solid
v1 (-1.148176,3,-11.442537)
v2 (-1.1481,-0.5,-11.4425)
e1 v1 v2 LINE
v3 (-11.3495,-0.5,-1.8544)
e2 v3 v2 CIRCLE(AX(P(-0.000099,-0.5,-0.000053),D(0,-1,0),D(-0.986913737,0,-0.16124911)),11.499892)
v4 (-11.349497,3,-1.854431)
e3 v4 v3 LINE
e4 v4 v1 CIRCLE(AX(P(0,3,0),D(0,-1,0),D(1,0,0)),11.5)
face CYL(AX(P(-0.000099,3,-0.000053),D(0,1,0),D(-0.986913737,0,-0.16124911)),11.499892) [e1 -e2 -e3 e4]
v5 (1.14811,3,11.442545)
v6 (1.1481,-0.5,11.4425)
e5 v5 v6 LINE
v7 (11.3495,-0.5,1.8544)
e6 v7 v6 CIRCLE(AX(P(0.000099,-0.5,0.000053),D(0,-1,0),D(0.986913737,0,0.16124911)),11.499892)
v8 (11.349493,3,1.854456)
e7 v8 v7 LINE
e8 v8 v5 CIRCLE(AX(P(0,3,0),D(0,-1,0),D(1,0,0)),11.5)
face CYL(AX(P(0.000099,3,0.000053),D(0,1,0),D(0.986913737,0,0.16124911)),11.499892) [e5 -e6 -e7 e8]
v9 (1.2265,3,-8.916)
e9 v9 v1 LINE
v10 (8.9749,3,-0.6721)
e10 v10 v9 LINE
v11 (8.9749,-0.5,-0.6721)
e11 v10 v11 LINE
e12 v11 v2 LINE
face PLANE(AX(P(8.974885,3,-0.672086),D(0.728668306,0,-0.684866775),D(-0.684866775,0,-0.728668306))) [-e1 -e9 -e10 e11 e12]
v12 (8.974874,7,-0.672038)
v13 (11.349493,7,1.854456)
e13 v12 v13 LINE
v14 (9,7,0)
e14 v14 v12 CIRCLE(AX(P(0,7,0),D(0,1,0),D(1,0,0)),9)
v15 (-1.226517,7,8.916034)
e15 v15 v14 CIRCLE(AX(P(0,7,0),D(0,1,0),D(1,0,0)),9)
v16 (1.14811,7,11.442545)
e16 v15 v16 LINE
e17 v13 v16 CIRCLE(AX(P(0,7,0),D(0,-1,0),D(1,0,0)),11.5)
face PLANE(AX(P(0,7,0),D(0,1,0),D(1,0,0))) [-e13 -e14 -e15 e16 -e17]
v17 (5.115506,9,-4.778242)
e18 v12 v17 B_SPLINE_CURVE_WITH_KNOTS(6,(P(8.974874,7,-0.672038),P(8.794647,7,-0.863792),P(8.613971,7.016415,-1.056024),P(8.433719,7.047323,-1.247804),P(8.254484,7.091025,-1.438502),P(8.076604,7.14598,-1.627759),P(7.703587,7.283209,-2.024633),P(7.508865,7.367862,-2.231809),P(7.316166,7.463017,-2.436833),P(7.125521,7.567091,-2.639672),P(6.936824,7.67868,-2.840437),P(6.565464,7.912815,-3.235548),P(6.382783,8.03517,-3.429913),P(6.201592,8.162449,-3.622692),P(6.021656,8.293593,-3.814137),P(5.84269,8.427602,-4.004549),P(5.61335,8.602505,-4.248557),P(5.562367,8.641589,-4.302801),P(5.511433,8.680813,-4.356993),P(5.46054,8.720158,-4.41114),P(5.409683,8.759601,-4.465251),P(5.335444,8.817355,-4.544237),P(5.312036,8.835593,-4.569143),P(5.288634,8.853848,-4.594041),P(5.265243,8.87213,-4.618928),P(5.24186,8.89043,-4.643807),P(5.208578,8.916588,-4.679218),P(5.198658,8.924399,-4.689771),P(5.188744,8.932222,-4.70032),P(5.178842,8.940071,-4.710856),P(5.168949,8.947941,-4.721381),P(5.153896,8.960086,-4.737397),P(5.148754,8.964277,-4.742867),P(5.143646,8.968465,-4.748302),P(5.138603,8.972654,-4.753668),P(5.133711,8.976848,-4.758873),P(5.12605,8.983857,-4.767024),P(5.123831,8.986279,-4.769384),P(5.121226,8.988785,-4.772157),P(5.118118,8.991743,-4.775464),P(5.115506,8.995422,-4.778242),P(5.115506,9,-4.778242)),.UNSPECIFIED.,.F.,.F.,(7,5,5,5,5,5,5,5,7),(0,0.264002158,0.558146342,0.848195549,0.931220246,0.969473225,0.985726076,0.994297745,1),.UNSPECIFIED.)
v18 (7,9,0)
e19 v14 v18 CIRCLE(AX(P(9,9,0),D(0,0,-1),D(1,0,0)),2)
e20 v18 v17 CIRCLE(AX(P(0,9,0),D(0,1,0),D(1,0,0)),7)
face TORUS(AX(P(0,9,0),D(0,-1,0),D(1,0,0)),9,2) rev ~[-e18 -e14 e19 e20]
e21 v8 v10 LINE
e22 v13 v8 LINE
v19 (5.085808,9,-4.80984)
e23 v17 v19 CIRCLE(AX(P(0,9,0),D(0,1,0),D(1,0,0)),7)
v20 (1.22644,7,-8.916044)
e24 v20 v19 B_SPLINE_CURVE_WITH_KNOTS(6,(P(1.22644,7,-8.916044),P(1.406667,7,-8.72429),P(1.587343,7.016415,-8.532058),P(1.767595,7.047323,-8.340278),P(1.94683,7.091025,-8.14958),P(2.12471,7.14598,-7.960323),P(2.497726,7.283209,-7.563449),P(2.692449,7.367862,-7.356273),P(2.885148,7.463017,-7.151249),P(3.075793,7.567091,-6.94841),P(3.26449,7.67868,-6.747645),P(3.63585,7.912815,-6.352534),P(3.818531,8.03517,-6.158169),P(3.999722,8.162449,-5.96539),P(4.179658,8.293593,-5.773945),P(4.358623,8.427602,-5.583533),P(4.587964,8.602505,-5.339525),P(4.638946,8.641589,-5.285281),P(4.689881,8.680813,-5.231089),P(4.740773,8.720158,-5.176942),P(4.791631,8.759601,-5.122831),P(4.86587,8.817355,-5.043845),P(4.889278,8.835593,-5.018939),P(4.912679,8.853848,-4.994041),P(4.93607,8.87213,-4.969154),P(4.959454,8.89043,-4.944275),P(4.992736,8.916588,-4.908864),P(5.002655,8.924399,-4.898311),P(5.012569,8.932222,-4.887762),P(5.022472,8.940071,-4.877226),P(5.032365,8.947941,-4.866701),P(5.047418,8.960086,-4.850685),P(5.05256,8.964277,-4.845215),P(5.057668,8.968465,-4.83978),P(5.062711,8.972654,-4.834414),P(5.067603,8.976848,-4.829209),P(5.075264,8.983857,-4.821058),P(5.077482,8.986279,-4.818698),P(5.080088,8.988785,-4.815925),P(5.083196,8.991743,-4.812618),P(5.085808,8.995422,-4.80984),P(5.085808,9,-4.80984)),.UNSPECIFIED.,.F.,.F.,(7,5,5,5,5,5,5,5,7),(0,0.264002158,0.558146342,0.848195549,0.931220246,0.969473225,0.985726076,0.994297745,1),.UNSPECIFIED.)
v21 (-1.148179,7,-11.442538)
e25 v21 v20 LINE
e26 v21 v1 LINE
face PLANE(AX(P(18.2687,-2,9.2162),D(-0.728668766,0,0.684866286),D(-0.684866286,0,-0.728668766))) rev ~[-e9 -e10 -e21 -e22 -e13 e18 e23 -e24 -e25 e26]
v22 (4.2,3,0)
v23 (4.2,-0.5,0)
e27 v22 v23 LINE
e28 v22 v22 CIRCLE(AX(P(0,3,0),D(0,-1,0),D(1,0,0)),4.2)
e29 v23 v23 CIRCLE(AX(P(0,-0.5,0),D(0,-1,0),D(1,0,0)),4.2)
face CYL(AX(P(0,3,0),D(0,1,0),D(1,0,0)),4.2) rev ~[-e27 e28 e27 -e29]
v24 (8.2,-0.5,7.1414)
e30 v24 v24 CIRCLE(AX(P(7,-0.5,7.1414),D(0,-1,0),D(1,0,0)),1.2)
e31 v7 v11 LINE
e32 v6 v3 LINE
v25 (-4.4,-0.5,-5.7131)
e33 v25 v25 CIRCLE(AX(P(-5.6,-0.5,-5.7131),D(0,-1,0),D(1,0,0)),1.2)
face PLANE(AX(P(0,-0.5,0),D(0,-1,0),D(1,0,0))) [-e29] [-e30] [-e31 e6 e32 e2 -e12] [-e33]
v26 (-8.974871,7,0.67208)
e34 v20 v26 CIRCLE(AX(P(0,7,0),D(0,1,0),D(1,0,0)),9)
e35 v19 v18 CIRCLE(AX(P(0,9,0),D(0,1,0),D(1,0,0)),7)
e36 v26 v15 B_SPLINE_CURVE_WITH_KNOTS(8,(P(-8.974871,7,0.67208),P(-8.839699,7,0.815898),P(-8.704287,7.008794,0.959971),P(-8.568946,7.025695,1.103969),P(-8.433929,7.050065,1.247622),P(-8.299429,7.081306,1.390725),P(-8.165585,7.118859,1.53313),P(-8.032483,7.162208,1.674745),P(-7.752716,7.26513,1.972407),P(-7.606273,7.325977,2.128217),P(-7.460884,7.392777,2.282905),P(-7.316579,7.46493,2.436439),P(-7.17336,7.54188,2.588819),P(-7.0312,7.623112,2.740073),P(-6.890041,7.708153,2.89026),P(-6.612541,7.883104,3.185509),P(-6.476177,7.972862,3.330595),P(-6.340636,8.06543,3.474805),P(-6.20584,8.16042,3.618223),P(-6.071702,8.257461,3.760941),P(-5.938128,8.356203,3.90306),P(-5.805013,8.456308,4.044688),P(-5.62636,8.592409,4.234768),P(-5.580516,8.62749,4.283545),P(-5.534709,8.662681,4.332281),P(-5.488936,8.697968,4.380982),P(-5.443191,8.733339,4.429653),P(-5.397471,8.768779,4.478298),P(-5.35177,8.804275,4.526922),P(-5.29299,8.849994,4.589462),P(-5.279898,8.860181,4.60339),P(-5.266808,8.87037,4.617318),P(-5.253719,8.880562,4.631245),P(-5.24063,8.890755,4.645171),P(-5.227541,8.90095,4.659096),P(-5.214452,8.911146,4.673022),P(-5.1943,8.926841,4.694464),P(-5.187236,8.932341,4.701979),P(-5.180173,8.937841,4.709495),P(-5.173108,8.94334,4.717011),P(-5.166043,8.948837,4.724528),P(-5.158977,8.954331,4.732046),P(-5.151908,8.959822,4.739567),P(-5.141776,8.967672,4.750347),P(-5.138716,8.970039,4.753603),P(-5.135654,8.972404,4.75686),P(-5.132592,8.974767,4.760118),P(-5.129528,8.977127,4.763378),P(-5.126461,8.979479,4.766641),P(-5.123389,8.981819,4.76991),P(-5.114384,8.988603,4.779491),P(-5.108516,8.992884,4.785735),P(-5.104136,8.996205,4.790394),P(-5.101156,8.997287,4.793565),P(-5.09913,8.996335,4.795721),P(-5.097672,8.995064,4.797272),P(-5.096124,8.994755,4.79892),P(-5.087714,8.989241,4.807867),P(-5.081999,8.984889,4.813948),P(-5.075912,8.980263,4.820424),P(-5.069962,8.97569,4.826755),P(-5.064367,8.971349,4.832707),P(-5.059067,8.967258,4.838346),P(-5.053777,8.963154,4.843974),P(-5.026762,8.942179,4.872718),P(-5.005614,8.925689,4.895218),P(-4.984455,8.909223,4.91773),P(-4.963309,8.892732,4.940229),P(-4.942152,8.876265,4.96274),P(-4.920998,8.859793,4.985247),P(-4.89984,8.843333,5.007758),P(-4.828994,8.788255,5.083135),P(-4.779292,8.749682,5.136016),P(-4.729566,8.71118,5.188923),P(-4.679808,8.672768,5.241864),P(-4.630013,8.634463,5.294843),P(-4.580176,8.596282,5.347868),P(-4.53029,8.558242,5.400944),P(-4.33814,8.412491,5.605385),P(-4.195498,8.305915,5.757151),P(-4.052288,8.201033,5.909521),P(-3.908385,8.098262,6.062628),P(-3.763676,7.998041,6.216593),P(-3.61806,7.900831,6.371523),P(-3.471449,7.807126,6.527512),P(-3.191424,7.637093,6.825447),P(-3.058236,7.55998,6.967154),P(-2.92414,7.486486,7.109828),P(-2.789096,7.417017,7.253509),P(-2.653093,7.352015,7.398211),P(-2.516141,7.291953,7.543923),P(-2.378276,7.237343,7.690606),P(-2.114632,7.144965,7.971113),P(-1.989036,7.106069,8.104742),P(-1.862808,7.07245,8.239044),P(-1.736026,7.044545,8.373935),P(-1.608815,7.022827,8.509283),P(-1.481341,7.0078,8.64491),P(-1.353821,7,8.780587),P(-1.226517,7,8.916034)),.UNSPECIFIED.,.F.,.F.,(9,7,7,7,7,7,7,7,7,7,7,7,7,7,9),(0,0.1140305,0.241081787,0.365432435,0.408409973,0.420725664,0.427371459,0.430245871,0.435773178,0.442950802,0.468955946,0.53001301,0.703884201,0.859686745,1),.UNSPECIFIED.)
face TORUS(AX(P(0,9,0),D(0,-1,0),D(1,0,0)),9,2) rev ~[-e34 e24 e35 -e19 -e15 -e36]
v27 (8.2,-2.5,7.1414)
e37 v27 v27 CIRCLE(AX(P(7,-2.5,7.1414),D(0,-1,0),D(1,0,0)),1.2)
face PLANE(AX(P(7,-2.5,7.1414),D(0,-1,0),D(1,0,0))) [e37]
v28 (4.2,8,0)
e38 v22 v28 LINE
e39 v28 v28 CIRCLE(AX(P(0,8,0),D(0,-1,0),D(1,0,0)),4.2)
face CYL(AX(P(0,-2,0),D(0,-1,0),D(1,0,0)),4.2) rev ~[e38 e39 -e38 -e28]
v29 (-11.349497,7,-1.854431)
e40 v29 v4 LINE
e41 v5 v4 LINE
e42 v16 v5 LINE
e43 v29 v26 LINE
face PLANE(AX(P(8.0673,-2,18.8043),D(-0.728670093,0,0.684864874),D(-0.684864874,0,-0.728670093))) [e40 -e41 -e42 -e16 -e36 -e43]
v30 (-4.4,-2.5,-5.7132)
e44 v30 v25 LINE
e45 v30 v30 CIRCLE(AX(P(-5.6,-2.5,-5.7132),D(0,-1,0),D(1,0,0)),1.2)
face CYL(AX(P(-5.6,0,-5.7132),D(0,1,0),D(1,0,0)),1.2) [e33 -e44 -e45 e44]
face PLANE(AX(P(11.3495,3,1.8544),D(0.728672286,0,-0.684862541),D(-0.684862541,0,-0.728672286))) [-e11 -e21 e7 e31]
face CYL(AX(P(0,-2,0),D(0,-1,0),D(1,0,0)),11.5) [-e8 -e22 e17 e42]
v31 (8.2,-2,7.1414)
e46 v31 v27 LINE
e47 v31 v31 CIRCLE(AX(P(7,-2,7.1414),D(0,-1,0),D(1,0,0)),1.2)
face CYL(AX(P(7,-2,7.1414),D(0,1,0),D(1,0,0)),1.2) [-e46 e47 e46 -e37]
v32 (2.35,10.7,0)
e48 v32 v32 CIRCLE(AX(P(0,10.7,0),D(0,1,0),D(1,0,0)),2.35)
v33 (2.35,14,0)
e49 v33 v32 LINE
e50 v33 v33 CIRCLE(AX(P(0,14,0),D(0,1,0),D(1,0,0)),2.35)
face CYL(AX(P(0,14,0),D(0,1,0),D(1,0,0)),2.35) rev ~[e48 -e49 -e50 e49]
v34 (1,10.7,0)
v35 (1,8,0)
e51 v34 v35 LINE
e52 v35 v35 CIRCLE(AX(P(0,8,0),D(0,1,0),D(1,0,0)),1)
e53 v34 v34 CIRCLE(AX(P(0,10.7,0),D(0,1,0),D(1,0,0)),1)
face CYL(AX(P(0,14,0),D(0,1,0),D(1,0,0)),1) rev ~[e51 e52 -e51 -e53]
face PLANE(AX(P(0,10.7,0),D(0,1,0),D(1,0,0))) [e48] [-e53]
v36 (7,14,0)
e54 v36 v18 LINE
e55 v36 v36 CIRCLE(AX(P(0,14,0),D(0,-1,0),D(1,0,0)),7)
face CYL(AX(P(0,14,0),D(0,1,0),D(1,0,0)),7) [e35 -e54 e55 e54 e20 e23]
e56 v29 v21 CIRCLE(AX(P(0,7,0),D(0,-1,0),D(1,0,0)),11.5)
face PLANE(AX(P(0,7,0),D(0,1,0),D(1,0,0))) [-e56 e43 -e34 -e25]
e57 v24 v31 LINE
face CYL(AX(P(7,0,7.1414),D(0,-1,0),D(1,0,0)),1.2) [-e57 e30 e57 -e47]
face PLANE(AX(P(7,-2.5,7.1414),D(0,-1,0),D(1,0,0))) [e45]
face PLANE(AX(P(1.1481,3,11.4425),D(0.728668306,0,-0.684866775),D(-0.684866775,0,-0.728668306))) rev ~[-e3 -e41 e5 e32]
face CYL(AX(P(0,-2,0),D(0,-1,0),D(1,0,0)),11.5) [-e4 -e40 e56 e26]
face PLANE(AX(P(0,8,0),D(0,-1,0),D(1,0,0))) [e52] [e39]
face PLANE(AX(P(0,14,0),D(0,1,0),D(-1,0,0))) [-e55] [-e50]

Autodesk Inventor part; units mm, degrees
ref_plane "YZ Plane" through (0, 0, 0) normal (1, 0, 0) x (0, 1, 0)
ref_plane "XZ Plane" through (0, 0, 0) normal (0, 1, 0) x (-1, 0, 0)
ref_plane "XY Plane" through (0, 0, 0) normal (0, 0, 1) x (1, 0, 0)
sketch "Skizze1" plane through (0, 0, 0) normal (0, 1, 0) x (-1, 0, 0)
  circle A0 centre (0, 0) radius 15
  dimension "d0" = 30
extrude "Extrusion1" add sketch "Skizze1" along normal blind 14
sketch "Skizze2" plane through (0, 0, 0) normal (0, -1, 0) x (1, 0, 0)
  line L0 (14.3188, 0.9) -> (12.9688, 0.9)
  line L1 (12.9688, -0.9) -> (14.3188, -0.9)
  line L2 (14.3188, -0.9) -> (14.3188, 0.9)
  line L3 (-21.3175, 0) -> (21.3175, 0) projected
  arc A0 (12.9688, 0.9) -> (0.9, 12.9688) centre (0, 0) ccw
  line L4 (-0.9, -12.9688) -> (-0.9, -14.3188)
  line L5 (-0.9, -14.3188) -> (0.9, -14.3188)
  line L6 (0.9, -14.3188) -> (0.9, -12.9688)
  line L7 (-12.9688, 0.9) -> (-14.3188, 0.9)
  line L8 (-14.3188, 0.9) -> (-14.3188, -0.9)
  line L9 (-14.3188, -0.9) -> (-12.9688, -0.9)
  line L10 (-0.9, 12.9688) -> (-0.9, 14.3188)
  line L11 (-0.9, 14.3188) -> (0.9, 14.3188)
  line L12 (0.9, 14.3188) -> (0.9, 12.9688)
  line L13 (0, -21.3175) -> (0, 21.3175) projected
  line L14 (-21.3175, 0) -> (21.3175, 0) projected
  arc A1 (0.9, -12.9688) -> (12.9688, -0.9) centre (0, 0) ccw
  arc A2 (-12.9688, -0.9) -> (-0.9, -12.9688) centre (0, 0) ccw
  arc A3 (-0.9, 12.9688) -> (-12.9688, 0.9) centre (0, 0) ccw
  circle A4 centre (0, 0) radius 4.2
  circle A5 centre (7, 7.1414) radius 1.2
  circle A6 centre (-5.6, -5.7131) radius 1.2
  dimension "d4" = 0.9
  dimension "d5" = 0.9
  dimension "d8" = 1.35
  dimension "d9" = 1.35
  dimension "d10" = 1.8
  dimension "d11" = 0.9
  dimension "d12" = 1.35
  dimension "d13" = 1.8
  dimension "d14" = 0.9
  dimension "d15" = 0.9
  dimension "d16" = 1.35
  dimension "d17" = 8.4
  dimension "d18" = 2.4
  dimension "d19" = 2.4
  dimension "d20" = 8
  dimension "d21" = 10
  dimension "d22" = 7
  dimension "d23" = 5.6
  dimension "d50" = 13
  dimension "d51" = 13
  dimension "d52" = 1.35
  dimension "d53" = 1.35
  dimension "d54" = 1.35
extrude "Extrusion2" cut sketch "Skizze2" against normal blind 3 contours L2 L3 A4 L13 L11 L12 A0 L0 | L2 L1 A1 L6 L5 L13 A4 L3 | A4 L3 L8 L7 A3 L10 L11 L13 | L13 L5 L4 A2 L9 L8 L3 A4
sketch "Skizze4" plane through (7, 0, 7.1414) normal (0, -1, 0) x (1, 0, 0)
  circle A0 centre (-7, -7.1414) radius 4.2
  circle A1 centre (-12.6, -12.8546) radius 1.2
  circle A2 centre (0, 0) radius 1.2
  line L0 (-7, -28.1414) -> (-7, 13.8586) projected
  dimension "d26" = 2.4
  dimension "d27" = 5.6
  dimension "d28" = 8
  dimension "d44" = 8.4
  dimension "d45" = 2.4
extrude "Extrusion3" add sketch "Skizze4" along normal blind 2
sketch "Skizze5" plane through (0, 14, 0) normal (0, 1, 0) x (1, 0, 0)
  circle A0 centre (0, 0) radius 19.262
  circle A1 centre (0, 0) radius 7
  dimension "d31" = 14
extrude "Extrusion4" cut sketch "Skizze5" against normal blind 7
fillet "Rundung1" radius 1 8 edges at (12.9688, 1.5, -0.9) (12.9688, 1.5, 0.9) (0.9, 1.5, -12.9688) (-0.9, 1.5, -12.9688) (-12.9688, 1.5, -0.9) (-12.9688, 1.5, 0.9) (-0.9, 1.5, 12.9688) (0.9, 1.5, 12.9688)
sketch "Skizze8" plane through (0, 14, 0) normal (0, 1, 0) x (1, 0, 0)
  circle A0 centre (0, 0) radius 1
  dimension "d46" = 2
extrude "Extrusion7" cut sketch "Skizze8" against normal blind 7
fillet "Rundung2" radius 2 1 edges at (-7, 7, 0)
sketch "Skizze9" plane through (0, -2, 0) normal (0, -1, 0) x (1, 0, 0)
  line L0 (18.2687, 9.2162) -> (-7.478, -18.1772)
  line L1 (-7.478, -18.1772) -> (18.2687, -18.1772)
  line L2 (18.2687, -18.1772) -> (18.2687, 9.2162)
  line L3 (8.0673, 18.8043) -> (-17.6793, -8.5891)
  line L4 (-17.6793, -8.5891) -> (-17.6793, 18.8043)
  line L5 (-17.6793, 18.8043) -> (8.0673, 18.8043)
  point P0 (0, 0)
  dimension "d55" = 7
  dimension "d56" = 7
extrude "Extrusion8" cut sketch "Skizze9" against normal blind 50
sketch "Skizze10" plane through (0, -2, 0) normal (0, -1, 0) x (1, 0, 0)
  circle A0 centre (0, 0) radius 11.5
  circle A1 centre (0, 0) radius 18.9246
  dimension "d61" = 23
extrude "Extrusion9" cut sketch "Skizze10" against normal blind 10
sketch "Skizze11" plane through (0, -2, 0) normal (0, -1, 0) x (1, 0, 0)
  circle A0 centre (0, 0) radius 1 projected
  circle A1 centre (0, 0) radius 4.2
extrude "Extrusion10" cut sketch "Skizze11" against normal blind 10 contours A0 | A1
sketch "Skizze13" plane through (0, 3, 0) normal (0, -1, 0) x (1, 0, 0)
  circle A0 centre (7, 7.1414) radius 1.2 projected
  circle A1 centre (7, 7.1414) radius 1.2
  circle A2 centre (-5.6, -5.7131) radius 1.2 projected
  circle A3 centre (-5.6, -5.7131) radius 1.2
  arc A4 (11.3495, 1.8544) -> (1.1481, 11.4425) centre (0, 0) ccw
  line L0 (11.3495, 1.8544) -> (8.9749, -0.6721) projected
  line L1 (11.3495, 1.8544) -> (-1.1481, -11.4425)
  line L2 (1.1481, 11.4425) -> (-11.3495, -1.8544)
  line L3 (1.2265, -8.916) -> (-1.1481, -11.4425) projected
  arc A5 (-11.3495, -1.8544) -> (-1.1481, -11.4425) centre (0, 0) ccw
  circle A6 centre (0, 0) radius 4.2
extrude "Extrusion11" add sketch "Skizze13" along normal blind 3.5
sketch "Skizze14" plane through (7, -2, 7.1414) normal (0, -1, 0) x (1, 0, 0)
  circle A0 centre (0, 0) radius 1.2 projected
  circle A1 centre (0, 0) radius 1.2
  circle A2 centre (-12.6, -12.8546) radius 1.2 projected
  circle A3 centre (-12.6, -12.8546) radius 1.2
  point P0 (-7, -7.1414)
extrude "Extrusion12" add sketch "Skizze14" along normal blind 0.5
sketch "Skizze15" plane through (0, 14, 0) normal (0, 1, 0) x (1, 0, 0)
  circle A0 centre (0, 0) radius 1 projected
  circle A1 centre (0, 0) radius 2.35
  dimension "d68" = 4.7
extrude "Extrusion13" cut sketch "Skizze15" against normal blind 3.3 contours A0 | A1
properties part number "Adaptation_on_OPdevside_4_1"
